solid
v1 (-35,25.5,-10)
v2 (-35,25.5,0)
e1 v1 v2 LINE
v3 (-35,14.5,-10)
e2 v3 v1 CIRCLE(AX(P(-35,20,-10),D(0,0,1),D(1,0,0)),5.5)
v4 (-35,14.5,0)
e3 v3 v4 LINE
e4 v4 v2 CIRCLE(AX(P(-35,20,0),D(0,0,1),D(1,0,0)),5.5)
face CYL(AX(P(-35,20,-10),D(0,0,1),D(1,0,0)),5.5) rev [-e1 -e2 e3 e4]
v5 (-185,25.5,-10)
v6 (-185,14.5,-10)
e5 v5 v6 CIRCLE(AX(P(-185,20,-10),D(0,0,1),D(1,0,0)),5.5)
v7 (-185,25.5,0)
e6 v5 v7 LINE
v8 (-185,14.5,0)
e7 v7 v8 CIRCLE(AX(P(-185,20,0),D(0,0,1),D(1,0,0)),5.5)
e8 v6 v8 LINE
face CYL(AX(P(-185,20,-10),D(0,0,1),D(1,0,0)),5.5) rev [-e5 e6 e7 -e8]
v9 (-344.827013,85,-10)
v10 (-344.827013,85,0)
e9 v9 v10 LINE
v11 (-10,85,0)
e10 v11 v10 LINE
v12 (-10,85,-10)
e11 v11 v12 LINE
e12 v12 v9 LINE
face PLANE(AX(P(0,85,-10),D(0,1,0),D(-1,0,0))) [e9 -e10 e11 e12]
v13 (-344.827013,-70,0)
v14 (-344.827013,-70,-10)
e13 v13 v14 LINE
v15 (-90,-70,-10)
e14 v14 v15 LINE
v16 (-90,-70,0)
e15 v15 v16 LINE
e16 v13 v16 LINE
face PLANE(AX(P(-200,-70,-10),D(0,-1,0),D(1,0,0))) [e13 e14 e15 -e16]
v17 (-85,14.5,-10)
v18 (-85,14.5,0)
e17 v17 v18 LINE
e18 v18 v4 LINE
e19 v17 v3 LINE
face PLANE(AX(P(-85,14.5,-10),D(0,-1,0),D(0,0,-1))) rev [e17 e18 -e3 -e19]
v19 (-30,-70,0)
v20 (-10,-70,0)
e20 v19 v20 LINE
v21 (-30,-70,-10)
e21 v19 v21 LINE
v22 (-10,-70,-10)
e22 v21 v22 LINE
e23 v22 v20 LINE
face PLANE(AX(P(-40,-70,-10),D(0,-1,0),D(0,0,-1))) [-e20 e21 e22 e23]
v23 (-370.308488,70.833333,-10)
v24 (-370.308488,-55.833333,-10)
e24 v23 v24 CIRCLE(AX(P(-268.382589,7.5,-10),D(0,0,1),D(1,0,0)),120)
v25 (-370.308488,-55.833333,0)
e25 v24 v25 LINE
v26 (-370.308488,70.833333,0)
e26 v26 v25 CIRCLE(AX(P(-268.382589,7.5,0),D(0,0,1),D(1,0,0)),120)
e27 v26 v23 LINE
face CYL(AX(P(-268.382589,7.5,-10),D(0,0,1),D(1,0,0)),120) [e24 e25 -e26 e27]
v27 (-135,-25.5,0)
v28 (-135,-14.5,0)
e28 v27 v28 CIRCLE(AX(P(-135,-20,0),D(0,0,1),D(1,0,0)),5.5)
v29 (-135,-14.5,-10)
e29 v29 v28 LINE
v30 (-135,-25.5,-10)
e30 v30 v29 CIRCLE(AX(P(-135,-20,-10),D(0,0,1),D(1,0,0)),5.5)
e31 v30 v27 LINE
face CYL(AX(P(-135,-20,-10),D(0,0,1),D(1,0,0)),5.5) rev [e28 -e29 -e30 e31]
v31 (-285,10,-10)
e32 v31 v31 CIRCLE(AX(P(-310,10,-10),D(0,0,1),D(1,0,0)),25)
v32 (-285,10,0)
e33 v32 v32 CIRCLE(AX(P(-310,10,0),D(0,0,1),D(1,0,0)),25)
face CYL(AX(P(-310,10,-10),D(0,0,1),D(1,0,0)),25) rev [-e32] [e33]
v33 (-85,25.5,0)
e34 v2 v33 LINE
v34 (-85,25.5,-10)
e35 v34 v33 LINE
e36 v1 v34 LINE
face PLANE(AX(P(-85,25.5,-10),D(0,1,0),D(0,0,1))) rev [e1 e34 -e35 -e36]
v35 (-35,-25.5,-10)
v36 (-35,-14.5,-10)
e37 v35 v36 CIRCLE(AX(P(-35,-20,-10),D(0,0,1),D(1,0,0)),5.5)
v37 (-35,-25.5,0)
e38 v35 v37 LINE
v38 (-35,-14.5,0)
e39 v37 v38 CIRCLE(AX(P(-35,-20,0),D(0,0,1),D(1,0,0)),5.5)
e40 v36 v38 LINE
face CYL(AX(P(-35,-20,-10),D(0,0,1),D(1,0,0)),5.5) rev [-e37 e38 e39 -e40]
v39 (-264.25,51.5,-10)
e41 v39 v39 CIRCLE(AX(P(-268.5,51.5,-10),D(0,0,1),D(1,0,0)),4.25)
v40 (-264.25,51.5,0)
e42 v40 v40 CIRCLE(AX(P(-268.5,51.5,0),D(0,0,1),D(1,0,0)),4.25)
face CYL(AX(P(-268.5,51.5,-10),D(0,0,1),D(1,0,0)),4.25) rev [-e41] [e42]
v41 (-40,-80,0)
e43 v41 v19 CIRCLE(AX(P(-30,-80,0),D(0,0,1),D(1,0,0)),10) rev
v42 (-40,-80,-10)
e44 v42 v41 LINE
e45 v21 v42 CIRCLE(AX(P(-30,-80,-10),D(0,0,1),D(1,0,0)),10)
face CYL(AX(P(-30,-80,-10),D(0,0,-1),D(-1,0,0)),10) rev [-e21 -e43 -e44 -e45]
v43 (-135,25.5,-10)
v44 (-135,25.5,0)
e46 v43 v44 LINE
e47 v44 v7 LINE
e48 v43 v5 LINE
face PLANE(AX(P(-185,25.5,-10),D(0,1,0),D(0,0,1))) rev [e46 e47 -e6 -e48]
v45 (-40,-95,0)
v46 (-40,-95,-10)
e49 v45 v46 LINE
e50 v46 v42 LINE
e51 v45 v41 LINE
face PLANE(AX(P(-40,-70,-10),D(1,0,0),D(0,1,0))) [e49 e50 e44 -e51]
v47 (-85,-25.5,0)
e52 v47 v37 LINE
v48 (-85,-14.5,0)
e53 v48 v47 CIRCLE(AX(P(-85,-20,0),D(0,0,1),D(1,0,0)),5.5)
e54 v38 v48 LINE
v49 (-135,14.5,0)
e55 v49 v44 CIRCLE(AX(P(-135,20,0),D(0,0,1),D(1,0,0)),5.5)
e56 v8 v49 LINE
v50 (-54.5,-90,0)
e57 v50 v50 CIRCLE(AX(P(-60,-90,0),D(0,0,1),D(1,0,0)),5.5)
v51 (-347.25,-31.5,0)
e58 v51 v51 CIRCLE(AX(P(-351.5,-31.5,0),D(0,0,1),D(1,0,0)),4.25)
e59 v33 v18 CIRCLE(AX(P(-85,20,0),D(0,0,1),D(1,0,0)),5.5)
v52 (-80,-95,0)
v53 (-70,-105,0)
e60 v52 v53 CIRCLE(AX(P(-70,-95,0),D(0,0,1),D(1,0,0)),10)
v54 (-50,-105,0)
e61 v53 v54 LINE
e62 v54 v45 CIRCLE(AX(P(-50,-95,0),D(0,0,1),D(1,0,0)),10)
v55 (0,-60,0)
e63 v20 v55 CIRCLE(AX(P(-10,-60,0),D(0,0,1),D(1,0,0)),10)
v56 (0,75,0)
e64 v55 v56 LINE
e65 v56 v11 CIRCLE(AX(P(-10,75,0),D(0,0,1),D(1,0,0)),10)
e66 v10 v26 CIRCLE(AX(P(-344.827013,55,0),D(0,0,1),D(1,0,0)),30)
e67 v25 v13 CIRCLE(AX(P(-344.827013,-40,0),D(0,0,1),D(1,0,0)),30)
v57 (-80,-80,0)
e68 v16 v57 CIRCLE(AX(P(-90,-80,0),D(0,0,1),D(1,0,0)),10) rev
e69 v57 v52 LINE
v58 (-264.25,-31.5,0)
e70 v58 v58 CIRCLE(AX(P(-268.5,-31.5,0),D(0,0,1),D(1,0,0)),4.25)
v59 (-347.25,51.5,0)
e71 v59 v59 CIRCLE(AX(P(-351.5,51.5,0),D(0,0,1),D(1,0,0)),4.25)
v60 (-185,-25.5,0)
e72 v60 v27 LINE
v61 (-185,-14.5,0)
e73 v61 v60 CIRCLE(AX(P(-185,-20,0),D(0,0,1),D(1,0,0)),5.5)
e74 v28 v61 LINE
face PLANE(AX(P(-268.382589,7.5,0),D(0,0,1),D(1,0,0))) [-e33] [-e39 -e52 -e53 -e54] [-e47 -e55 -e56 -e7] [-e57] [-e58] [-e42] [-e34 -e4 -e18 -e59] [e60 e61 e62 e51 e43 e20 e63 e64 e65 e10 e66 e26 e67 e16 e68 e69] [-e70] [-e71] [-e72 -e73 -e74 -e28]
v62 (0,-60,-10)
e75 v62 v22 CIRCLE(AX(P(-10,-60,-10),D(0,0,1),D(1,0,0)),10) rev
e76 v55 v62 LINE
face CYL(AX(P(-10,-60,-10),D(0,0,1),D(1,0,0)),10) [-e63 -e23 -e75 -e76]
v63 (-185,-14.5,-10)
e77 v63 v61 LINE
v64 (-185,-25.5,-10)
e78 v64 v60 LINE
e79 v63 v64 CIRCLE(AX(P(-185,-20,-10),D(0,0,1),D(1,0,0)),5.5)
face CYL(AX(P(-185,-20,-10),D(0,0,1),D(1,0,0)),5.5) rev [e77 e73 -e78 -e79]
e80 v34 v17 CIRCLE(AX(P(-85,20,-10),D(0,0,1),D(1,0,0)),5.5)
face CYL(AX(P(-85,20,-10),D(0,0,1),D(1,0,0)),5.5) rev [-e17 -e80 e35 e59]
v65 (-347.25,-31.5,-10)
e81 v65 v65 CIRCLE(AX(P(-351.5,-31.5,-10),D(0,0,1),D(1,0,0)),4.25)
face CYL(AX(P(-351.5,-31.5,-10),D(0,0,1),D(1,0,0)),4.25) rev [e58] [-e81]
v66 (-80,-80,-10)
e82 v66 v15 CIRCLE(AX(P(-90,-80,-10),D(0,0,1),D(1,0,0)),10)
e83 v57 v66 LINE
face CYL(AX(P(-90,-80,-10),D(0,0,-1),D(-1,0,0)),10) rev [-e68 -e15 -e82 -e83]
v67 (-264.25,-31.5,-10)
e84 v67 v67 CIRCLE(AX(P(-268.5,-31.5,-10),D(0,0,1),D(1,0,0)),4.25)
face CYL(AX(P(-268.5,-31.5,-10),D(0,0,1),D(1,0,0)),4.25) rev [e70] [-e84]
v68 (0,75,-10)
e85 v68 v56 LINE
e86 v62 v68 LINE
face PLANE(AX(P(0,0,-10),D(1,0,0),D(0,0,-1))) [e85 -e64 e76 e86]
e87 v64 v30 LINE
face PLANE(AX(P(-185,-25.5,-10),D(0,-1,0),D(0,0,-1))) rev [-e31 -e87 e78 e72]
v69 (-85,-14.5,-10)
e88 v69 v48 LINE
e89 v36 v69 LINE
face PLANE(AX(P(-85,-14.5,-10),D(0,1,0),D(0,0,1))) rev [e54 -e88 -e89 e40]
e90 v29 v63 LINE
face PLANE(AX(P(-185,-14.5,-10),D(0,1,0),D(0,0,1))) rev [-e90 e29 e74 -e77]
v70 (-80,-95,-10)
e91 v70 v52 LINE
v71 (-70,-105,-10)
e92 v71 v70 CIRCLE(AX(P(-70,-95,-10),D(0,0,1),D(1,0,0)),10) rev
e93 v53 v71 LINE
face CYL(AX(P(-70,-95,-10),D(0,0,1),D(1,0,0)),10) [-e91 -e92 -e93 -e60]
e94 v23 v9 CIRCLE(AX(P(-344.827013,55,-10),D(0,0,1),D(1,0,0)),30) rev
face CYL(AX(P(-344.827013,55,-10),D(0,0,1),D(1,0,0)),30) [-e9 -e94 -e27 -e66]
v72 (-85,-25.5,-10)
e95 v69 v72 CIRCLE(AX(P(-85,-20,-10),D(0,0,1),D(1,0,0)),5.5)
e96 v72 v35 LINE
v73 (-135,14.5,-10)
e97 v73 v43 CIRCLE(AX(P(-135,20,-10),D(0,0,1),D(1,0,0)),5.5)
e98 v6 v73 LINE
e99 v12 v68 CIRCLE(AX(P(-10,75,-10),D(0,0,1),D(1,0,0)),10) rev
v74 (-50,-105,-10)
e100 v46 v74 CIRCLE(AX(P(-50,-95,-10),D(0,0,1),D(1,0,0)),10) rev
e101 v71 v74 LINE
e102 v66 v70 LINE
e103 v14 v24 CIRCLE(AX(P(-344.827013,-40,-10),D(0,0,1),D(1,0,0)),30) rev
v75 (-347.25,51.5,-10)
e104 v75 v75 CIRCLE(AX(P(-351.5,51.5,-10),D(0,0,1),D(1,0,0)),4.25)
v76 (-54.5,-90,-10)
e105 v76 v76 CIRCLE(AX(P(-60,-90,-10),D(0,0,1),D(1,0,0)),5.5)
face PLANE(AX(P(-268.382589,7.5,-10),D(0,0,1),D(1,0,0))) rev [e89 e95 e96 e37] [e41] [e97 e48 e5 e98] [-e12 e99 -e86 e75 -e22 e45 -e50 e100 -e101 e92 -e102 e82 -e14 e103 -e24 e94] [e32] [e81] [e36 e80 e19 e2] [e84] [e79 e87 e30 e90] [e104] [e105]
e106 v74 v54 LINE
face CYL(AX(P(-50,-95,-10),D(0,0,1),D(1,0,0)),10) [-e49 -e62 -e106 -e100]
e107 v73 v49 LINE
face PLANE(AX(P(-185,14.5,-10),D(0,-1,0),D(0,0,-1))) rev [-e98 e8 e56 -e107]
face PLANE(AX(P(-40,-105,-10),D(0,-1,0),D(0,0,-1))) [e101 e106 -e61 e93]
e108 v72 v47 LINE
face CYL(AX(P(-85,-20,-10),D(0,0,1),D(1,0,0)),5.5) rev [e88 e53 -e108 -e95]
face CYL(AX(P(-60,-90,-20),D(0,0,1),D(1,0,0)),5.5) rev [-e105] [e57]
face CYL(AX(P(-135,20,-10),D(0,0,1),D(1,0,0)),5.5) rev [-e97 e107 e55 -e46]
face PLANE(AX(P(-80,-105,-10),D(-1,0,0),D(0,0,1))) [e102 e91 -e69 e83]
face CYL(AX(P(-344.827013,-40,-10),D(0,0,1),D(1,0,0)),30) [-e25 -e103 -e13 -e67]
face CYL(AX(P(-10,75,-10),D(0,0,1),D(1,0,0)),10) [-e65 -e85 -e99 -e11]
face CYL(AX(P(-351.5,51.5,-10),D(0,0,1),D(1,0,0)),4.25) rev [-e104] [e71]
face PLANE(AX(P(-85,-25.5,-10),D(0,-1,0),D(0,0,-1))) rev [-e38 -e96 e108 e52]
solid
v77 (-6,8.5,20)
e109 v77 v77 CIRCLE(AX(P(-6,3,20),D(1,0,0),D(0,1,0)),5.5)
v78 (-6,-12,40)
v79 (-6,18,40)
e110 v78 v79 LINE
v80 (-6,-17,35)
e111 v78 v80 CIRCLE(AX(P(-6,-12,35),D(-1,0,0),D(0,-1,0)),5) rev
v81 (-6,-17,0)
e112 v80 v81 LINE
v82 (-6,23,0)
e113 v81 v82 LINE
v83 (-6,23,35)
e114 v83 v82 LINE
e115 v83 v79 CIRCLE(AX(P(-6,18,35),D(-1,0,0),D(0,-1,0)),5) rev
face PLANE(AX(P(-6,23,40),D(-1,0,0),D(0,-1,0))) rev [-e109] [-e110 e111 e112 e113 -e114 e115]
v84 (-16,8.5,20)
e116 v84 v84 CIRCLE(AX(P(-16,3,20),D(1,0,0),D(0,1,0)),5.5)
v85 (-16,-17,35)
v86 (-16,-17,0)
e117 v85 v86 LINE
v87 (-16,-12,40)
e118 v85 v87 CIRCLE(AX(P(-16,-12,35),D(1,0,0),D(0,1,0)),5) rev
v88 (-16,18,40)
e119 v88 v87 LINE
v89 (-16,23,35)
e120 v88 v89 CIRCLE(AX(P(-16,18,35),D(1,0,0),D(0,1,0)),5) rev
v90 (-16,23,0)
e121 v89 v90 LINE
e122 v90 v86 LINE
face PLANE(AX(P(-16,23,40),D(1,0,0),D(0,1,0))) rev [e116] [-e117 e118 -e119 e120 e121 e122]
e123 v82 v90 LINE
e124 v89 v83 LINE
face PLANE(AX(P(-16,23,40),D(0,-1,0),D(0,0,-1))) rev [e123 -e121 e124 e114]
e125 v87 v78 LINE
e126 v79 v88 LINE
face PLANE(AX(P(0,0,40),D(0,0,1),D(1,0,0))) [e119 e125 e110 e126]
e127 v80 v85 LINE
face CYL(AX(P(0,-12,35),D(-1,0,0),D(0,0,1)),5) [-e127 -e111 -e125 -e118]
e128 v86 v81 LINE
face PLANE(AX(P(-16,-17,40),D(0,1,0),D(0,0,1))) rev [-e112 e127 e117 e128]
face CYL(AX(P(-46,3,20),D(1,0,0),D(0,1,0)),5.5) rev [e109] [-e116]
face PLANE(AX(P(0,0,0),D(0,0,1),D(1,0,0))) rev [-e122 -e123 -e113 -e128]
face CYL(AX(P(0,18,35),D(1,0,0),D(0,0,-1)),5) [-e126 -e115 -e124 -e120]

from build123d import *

# Parameters (mm, degrees)
TABAN_FLAN_1_DEPTH          = 10
IZIM2_R                     = 25
IZIM2_R_2                   = 4.25
KES_EKSTR_ZYON1_DEPTH       = 10
IZIM3_R                     = 5.5
KES_EKSTR_ZYON2_DEPTH       = 20
IZIM4_W                     = 10
IZIM4_H                     = 40
Y_KSEKLIK_EKSTR_ZYON1_DEPTH = 40
IZIM5_R                     = 5.5
KES_EKSTR_ZYON3_DEPTH       = 40
RADYUS3_R                   = 5
RADYUS5_R                   = 10
RADYUS6_R                   = 30
RADYUS7_R                   = 10


# Sheet-metal steps are written as plain solids
with BuildPart() as part:
    # Çizim1 → Taban-Flanş1 (new body)
    with BuildSketch(Plane.XY):
        with BuildLine():
            Line((-360, -70), (-250, -70))
            Line((-250, -70), (-200, -70))
            Line((-200, -70), (-80, -70))
            Line((-80, -70), (-80, -105))
            Line((-80, -105), (-40, -105))
            Line((-40, -105), (-40, -70))
            Line((-40, -70), (0, -70))
            Line((0, -70), (0, 0))
            Line((0, 0), (0, 85))
            Line((0, 85), (-360, 85))
            ThreePointArc((-360, 85), (-388.382588991, 7.5), (-360, -70))
        make_face()
    extrude(amount=-TABAN_FLAN_1_DEPTH)

    # Çizim2 → Kes-Ekstrüzyon1 (cut)
    with BuildSketch(Plane.XY):
        with Locations((-310, 10)):
            Circle(IZIM2_R)
        with Locations((-351.5, 51.5)):
            Circle(IZIM2_R_2)
        with Locations((-268.5, 51.5)):
            Circle(IZIM2_R_2)
        with Locations((-351.5, -31.5)):
            Circle(IZIM2_R_2)
        with Locations((-268.5, -31.5)):
            Circle(IZIM2_R_2)
        with BuildLine():
            Line((-85, 25.5), (-35, 25.5))
            ThreePointArc((-35, 25.5), (-29.5, 20), (-35, 14.5))
            Line((-35, 14.5), (-85, 14.5))
            ThreePointArc((-85, 14.5), (-90.5, 20), (-85, 25.5))
        make_face()
        with BuildLine():
            Line((-85, -14.5), (-35, -14.5))
            ThreePointArc((-35, -14.5), (-29.5, -20), (-35, -25.5))
            Line((-35, -25.5), (-85, -25.5))
            ThreePointArc((-85, -25.5), (-90.5, -20), (-85, -14.5))
        make_face()
        with BuildLine():
            Line((-185, 25.5), (-135, 25.5))
            ThreePointArc((-135, 25.5), (-129.5, 20), (-135, 14.5))
            Line((-135, 14.5), (-185, 14.5))
            ThreePointArc((-185, 14.5), (-190.5, 20), (-185, 25.5))
        make_face()
        with BuildLine():
            Line((-185, -14.5), (-135, -14.5))
            ThreePointArc((-135, -14.5), (-129.5, -20), (-135, -25.5))
            Line((-135, -25.5), (-185, -25.5))
            ThreePointArc((-185, -25.5), (-190.5, -20), (-185, -14.5))
        make_face()
    extrude(amount=-KES_EKSTR_ZYON1_DEPTH, mode=Mode.SUBTRACT)

    # Çizim3 → Kes-Ekstrüzyon2 (cut)
    with BuildSketch(Plane.XY):
        with Locations((-60, -90)):
            Circle(IZIM3_R)
    extrude(amount=-KES_EKSTR_ZYON2_DEPTH, mode=Mode.SUBTRACT)

    # Radyus5
    radyus5_edges = [part.edges().sort_by_distance(p)[0] for p in [
        (-40, -70, -5),
        (-40, -105, -5),
        (-80, -105, -5),
        (-80, -70, -5),
    ]]
    fillet(radyus5_edges, radius=RADYUS5_R)

    # Radyus6
    radyus6_edges = [part.edges().sort_by_distance(p)[0] for p in [
        (-360, -70, -5),
        (-360, 85, -5),
    ]]
    fillet(radyus6_edges, radius=RADYUS6_R)

    # Radyus7
    radyus7_edges = [part.edges().sort_by_distance(p)[0] for p in [
        (0, -70, -5),
        (0, 85, -5),
    ]]
    fillet(radyus7_edges, radius=RADYUS7_R)


with BuildPart() as body_2:
    # Çizim4 → Yükseklik-Ekstrüzyon1 (new body)
    with BuildSketch(Plane.XY):
        with Locations((-11, 3)):
            Rectangle(IZIM4_W, IZIM4_H)
    extrude(amount=Y_KSEKLIK_EKSTR_ZYON1_DEPTH)

    # Çizim5 → Kes-Ekstrüzyon3 (cut)
    with BuildSketch(Plane(origin=(-6, 0, 0), x_dir=(0, 0, -1), z_dir=(1, 0, 0))):
        with Locations(Location((-20, 3, 0), (0, 0, 90))):
            Circle(IZIM5_R)
    extrude(amount=-KES_EKSTR_ZYON3_DEPTH, mode=Mode.SUBTRACT)

    # Radyus3
    radyus3_edges = [body_2.edges().sort_by_distance(p)[0] for p in [
        (-11, -17, 40),
        (-11, 23, 40),
    ]]
    fillet(radyus3_edges, radius=RADYUS3_R)


solid = Compound([part.part, body_2.part])
